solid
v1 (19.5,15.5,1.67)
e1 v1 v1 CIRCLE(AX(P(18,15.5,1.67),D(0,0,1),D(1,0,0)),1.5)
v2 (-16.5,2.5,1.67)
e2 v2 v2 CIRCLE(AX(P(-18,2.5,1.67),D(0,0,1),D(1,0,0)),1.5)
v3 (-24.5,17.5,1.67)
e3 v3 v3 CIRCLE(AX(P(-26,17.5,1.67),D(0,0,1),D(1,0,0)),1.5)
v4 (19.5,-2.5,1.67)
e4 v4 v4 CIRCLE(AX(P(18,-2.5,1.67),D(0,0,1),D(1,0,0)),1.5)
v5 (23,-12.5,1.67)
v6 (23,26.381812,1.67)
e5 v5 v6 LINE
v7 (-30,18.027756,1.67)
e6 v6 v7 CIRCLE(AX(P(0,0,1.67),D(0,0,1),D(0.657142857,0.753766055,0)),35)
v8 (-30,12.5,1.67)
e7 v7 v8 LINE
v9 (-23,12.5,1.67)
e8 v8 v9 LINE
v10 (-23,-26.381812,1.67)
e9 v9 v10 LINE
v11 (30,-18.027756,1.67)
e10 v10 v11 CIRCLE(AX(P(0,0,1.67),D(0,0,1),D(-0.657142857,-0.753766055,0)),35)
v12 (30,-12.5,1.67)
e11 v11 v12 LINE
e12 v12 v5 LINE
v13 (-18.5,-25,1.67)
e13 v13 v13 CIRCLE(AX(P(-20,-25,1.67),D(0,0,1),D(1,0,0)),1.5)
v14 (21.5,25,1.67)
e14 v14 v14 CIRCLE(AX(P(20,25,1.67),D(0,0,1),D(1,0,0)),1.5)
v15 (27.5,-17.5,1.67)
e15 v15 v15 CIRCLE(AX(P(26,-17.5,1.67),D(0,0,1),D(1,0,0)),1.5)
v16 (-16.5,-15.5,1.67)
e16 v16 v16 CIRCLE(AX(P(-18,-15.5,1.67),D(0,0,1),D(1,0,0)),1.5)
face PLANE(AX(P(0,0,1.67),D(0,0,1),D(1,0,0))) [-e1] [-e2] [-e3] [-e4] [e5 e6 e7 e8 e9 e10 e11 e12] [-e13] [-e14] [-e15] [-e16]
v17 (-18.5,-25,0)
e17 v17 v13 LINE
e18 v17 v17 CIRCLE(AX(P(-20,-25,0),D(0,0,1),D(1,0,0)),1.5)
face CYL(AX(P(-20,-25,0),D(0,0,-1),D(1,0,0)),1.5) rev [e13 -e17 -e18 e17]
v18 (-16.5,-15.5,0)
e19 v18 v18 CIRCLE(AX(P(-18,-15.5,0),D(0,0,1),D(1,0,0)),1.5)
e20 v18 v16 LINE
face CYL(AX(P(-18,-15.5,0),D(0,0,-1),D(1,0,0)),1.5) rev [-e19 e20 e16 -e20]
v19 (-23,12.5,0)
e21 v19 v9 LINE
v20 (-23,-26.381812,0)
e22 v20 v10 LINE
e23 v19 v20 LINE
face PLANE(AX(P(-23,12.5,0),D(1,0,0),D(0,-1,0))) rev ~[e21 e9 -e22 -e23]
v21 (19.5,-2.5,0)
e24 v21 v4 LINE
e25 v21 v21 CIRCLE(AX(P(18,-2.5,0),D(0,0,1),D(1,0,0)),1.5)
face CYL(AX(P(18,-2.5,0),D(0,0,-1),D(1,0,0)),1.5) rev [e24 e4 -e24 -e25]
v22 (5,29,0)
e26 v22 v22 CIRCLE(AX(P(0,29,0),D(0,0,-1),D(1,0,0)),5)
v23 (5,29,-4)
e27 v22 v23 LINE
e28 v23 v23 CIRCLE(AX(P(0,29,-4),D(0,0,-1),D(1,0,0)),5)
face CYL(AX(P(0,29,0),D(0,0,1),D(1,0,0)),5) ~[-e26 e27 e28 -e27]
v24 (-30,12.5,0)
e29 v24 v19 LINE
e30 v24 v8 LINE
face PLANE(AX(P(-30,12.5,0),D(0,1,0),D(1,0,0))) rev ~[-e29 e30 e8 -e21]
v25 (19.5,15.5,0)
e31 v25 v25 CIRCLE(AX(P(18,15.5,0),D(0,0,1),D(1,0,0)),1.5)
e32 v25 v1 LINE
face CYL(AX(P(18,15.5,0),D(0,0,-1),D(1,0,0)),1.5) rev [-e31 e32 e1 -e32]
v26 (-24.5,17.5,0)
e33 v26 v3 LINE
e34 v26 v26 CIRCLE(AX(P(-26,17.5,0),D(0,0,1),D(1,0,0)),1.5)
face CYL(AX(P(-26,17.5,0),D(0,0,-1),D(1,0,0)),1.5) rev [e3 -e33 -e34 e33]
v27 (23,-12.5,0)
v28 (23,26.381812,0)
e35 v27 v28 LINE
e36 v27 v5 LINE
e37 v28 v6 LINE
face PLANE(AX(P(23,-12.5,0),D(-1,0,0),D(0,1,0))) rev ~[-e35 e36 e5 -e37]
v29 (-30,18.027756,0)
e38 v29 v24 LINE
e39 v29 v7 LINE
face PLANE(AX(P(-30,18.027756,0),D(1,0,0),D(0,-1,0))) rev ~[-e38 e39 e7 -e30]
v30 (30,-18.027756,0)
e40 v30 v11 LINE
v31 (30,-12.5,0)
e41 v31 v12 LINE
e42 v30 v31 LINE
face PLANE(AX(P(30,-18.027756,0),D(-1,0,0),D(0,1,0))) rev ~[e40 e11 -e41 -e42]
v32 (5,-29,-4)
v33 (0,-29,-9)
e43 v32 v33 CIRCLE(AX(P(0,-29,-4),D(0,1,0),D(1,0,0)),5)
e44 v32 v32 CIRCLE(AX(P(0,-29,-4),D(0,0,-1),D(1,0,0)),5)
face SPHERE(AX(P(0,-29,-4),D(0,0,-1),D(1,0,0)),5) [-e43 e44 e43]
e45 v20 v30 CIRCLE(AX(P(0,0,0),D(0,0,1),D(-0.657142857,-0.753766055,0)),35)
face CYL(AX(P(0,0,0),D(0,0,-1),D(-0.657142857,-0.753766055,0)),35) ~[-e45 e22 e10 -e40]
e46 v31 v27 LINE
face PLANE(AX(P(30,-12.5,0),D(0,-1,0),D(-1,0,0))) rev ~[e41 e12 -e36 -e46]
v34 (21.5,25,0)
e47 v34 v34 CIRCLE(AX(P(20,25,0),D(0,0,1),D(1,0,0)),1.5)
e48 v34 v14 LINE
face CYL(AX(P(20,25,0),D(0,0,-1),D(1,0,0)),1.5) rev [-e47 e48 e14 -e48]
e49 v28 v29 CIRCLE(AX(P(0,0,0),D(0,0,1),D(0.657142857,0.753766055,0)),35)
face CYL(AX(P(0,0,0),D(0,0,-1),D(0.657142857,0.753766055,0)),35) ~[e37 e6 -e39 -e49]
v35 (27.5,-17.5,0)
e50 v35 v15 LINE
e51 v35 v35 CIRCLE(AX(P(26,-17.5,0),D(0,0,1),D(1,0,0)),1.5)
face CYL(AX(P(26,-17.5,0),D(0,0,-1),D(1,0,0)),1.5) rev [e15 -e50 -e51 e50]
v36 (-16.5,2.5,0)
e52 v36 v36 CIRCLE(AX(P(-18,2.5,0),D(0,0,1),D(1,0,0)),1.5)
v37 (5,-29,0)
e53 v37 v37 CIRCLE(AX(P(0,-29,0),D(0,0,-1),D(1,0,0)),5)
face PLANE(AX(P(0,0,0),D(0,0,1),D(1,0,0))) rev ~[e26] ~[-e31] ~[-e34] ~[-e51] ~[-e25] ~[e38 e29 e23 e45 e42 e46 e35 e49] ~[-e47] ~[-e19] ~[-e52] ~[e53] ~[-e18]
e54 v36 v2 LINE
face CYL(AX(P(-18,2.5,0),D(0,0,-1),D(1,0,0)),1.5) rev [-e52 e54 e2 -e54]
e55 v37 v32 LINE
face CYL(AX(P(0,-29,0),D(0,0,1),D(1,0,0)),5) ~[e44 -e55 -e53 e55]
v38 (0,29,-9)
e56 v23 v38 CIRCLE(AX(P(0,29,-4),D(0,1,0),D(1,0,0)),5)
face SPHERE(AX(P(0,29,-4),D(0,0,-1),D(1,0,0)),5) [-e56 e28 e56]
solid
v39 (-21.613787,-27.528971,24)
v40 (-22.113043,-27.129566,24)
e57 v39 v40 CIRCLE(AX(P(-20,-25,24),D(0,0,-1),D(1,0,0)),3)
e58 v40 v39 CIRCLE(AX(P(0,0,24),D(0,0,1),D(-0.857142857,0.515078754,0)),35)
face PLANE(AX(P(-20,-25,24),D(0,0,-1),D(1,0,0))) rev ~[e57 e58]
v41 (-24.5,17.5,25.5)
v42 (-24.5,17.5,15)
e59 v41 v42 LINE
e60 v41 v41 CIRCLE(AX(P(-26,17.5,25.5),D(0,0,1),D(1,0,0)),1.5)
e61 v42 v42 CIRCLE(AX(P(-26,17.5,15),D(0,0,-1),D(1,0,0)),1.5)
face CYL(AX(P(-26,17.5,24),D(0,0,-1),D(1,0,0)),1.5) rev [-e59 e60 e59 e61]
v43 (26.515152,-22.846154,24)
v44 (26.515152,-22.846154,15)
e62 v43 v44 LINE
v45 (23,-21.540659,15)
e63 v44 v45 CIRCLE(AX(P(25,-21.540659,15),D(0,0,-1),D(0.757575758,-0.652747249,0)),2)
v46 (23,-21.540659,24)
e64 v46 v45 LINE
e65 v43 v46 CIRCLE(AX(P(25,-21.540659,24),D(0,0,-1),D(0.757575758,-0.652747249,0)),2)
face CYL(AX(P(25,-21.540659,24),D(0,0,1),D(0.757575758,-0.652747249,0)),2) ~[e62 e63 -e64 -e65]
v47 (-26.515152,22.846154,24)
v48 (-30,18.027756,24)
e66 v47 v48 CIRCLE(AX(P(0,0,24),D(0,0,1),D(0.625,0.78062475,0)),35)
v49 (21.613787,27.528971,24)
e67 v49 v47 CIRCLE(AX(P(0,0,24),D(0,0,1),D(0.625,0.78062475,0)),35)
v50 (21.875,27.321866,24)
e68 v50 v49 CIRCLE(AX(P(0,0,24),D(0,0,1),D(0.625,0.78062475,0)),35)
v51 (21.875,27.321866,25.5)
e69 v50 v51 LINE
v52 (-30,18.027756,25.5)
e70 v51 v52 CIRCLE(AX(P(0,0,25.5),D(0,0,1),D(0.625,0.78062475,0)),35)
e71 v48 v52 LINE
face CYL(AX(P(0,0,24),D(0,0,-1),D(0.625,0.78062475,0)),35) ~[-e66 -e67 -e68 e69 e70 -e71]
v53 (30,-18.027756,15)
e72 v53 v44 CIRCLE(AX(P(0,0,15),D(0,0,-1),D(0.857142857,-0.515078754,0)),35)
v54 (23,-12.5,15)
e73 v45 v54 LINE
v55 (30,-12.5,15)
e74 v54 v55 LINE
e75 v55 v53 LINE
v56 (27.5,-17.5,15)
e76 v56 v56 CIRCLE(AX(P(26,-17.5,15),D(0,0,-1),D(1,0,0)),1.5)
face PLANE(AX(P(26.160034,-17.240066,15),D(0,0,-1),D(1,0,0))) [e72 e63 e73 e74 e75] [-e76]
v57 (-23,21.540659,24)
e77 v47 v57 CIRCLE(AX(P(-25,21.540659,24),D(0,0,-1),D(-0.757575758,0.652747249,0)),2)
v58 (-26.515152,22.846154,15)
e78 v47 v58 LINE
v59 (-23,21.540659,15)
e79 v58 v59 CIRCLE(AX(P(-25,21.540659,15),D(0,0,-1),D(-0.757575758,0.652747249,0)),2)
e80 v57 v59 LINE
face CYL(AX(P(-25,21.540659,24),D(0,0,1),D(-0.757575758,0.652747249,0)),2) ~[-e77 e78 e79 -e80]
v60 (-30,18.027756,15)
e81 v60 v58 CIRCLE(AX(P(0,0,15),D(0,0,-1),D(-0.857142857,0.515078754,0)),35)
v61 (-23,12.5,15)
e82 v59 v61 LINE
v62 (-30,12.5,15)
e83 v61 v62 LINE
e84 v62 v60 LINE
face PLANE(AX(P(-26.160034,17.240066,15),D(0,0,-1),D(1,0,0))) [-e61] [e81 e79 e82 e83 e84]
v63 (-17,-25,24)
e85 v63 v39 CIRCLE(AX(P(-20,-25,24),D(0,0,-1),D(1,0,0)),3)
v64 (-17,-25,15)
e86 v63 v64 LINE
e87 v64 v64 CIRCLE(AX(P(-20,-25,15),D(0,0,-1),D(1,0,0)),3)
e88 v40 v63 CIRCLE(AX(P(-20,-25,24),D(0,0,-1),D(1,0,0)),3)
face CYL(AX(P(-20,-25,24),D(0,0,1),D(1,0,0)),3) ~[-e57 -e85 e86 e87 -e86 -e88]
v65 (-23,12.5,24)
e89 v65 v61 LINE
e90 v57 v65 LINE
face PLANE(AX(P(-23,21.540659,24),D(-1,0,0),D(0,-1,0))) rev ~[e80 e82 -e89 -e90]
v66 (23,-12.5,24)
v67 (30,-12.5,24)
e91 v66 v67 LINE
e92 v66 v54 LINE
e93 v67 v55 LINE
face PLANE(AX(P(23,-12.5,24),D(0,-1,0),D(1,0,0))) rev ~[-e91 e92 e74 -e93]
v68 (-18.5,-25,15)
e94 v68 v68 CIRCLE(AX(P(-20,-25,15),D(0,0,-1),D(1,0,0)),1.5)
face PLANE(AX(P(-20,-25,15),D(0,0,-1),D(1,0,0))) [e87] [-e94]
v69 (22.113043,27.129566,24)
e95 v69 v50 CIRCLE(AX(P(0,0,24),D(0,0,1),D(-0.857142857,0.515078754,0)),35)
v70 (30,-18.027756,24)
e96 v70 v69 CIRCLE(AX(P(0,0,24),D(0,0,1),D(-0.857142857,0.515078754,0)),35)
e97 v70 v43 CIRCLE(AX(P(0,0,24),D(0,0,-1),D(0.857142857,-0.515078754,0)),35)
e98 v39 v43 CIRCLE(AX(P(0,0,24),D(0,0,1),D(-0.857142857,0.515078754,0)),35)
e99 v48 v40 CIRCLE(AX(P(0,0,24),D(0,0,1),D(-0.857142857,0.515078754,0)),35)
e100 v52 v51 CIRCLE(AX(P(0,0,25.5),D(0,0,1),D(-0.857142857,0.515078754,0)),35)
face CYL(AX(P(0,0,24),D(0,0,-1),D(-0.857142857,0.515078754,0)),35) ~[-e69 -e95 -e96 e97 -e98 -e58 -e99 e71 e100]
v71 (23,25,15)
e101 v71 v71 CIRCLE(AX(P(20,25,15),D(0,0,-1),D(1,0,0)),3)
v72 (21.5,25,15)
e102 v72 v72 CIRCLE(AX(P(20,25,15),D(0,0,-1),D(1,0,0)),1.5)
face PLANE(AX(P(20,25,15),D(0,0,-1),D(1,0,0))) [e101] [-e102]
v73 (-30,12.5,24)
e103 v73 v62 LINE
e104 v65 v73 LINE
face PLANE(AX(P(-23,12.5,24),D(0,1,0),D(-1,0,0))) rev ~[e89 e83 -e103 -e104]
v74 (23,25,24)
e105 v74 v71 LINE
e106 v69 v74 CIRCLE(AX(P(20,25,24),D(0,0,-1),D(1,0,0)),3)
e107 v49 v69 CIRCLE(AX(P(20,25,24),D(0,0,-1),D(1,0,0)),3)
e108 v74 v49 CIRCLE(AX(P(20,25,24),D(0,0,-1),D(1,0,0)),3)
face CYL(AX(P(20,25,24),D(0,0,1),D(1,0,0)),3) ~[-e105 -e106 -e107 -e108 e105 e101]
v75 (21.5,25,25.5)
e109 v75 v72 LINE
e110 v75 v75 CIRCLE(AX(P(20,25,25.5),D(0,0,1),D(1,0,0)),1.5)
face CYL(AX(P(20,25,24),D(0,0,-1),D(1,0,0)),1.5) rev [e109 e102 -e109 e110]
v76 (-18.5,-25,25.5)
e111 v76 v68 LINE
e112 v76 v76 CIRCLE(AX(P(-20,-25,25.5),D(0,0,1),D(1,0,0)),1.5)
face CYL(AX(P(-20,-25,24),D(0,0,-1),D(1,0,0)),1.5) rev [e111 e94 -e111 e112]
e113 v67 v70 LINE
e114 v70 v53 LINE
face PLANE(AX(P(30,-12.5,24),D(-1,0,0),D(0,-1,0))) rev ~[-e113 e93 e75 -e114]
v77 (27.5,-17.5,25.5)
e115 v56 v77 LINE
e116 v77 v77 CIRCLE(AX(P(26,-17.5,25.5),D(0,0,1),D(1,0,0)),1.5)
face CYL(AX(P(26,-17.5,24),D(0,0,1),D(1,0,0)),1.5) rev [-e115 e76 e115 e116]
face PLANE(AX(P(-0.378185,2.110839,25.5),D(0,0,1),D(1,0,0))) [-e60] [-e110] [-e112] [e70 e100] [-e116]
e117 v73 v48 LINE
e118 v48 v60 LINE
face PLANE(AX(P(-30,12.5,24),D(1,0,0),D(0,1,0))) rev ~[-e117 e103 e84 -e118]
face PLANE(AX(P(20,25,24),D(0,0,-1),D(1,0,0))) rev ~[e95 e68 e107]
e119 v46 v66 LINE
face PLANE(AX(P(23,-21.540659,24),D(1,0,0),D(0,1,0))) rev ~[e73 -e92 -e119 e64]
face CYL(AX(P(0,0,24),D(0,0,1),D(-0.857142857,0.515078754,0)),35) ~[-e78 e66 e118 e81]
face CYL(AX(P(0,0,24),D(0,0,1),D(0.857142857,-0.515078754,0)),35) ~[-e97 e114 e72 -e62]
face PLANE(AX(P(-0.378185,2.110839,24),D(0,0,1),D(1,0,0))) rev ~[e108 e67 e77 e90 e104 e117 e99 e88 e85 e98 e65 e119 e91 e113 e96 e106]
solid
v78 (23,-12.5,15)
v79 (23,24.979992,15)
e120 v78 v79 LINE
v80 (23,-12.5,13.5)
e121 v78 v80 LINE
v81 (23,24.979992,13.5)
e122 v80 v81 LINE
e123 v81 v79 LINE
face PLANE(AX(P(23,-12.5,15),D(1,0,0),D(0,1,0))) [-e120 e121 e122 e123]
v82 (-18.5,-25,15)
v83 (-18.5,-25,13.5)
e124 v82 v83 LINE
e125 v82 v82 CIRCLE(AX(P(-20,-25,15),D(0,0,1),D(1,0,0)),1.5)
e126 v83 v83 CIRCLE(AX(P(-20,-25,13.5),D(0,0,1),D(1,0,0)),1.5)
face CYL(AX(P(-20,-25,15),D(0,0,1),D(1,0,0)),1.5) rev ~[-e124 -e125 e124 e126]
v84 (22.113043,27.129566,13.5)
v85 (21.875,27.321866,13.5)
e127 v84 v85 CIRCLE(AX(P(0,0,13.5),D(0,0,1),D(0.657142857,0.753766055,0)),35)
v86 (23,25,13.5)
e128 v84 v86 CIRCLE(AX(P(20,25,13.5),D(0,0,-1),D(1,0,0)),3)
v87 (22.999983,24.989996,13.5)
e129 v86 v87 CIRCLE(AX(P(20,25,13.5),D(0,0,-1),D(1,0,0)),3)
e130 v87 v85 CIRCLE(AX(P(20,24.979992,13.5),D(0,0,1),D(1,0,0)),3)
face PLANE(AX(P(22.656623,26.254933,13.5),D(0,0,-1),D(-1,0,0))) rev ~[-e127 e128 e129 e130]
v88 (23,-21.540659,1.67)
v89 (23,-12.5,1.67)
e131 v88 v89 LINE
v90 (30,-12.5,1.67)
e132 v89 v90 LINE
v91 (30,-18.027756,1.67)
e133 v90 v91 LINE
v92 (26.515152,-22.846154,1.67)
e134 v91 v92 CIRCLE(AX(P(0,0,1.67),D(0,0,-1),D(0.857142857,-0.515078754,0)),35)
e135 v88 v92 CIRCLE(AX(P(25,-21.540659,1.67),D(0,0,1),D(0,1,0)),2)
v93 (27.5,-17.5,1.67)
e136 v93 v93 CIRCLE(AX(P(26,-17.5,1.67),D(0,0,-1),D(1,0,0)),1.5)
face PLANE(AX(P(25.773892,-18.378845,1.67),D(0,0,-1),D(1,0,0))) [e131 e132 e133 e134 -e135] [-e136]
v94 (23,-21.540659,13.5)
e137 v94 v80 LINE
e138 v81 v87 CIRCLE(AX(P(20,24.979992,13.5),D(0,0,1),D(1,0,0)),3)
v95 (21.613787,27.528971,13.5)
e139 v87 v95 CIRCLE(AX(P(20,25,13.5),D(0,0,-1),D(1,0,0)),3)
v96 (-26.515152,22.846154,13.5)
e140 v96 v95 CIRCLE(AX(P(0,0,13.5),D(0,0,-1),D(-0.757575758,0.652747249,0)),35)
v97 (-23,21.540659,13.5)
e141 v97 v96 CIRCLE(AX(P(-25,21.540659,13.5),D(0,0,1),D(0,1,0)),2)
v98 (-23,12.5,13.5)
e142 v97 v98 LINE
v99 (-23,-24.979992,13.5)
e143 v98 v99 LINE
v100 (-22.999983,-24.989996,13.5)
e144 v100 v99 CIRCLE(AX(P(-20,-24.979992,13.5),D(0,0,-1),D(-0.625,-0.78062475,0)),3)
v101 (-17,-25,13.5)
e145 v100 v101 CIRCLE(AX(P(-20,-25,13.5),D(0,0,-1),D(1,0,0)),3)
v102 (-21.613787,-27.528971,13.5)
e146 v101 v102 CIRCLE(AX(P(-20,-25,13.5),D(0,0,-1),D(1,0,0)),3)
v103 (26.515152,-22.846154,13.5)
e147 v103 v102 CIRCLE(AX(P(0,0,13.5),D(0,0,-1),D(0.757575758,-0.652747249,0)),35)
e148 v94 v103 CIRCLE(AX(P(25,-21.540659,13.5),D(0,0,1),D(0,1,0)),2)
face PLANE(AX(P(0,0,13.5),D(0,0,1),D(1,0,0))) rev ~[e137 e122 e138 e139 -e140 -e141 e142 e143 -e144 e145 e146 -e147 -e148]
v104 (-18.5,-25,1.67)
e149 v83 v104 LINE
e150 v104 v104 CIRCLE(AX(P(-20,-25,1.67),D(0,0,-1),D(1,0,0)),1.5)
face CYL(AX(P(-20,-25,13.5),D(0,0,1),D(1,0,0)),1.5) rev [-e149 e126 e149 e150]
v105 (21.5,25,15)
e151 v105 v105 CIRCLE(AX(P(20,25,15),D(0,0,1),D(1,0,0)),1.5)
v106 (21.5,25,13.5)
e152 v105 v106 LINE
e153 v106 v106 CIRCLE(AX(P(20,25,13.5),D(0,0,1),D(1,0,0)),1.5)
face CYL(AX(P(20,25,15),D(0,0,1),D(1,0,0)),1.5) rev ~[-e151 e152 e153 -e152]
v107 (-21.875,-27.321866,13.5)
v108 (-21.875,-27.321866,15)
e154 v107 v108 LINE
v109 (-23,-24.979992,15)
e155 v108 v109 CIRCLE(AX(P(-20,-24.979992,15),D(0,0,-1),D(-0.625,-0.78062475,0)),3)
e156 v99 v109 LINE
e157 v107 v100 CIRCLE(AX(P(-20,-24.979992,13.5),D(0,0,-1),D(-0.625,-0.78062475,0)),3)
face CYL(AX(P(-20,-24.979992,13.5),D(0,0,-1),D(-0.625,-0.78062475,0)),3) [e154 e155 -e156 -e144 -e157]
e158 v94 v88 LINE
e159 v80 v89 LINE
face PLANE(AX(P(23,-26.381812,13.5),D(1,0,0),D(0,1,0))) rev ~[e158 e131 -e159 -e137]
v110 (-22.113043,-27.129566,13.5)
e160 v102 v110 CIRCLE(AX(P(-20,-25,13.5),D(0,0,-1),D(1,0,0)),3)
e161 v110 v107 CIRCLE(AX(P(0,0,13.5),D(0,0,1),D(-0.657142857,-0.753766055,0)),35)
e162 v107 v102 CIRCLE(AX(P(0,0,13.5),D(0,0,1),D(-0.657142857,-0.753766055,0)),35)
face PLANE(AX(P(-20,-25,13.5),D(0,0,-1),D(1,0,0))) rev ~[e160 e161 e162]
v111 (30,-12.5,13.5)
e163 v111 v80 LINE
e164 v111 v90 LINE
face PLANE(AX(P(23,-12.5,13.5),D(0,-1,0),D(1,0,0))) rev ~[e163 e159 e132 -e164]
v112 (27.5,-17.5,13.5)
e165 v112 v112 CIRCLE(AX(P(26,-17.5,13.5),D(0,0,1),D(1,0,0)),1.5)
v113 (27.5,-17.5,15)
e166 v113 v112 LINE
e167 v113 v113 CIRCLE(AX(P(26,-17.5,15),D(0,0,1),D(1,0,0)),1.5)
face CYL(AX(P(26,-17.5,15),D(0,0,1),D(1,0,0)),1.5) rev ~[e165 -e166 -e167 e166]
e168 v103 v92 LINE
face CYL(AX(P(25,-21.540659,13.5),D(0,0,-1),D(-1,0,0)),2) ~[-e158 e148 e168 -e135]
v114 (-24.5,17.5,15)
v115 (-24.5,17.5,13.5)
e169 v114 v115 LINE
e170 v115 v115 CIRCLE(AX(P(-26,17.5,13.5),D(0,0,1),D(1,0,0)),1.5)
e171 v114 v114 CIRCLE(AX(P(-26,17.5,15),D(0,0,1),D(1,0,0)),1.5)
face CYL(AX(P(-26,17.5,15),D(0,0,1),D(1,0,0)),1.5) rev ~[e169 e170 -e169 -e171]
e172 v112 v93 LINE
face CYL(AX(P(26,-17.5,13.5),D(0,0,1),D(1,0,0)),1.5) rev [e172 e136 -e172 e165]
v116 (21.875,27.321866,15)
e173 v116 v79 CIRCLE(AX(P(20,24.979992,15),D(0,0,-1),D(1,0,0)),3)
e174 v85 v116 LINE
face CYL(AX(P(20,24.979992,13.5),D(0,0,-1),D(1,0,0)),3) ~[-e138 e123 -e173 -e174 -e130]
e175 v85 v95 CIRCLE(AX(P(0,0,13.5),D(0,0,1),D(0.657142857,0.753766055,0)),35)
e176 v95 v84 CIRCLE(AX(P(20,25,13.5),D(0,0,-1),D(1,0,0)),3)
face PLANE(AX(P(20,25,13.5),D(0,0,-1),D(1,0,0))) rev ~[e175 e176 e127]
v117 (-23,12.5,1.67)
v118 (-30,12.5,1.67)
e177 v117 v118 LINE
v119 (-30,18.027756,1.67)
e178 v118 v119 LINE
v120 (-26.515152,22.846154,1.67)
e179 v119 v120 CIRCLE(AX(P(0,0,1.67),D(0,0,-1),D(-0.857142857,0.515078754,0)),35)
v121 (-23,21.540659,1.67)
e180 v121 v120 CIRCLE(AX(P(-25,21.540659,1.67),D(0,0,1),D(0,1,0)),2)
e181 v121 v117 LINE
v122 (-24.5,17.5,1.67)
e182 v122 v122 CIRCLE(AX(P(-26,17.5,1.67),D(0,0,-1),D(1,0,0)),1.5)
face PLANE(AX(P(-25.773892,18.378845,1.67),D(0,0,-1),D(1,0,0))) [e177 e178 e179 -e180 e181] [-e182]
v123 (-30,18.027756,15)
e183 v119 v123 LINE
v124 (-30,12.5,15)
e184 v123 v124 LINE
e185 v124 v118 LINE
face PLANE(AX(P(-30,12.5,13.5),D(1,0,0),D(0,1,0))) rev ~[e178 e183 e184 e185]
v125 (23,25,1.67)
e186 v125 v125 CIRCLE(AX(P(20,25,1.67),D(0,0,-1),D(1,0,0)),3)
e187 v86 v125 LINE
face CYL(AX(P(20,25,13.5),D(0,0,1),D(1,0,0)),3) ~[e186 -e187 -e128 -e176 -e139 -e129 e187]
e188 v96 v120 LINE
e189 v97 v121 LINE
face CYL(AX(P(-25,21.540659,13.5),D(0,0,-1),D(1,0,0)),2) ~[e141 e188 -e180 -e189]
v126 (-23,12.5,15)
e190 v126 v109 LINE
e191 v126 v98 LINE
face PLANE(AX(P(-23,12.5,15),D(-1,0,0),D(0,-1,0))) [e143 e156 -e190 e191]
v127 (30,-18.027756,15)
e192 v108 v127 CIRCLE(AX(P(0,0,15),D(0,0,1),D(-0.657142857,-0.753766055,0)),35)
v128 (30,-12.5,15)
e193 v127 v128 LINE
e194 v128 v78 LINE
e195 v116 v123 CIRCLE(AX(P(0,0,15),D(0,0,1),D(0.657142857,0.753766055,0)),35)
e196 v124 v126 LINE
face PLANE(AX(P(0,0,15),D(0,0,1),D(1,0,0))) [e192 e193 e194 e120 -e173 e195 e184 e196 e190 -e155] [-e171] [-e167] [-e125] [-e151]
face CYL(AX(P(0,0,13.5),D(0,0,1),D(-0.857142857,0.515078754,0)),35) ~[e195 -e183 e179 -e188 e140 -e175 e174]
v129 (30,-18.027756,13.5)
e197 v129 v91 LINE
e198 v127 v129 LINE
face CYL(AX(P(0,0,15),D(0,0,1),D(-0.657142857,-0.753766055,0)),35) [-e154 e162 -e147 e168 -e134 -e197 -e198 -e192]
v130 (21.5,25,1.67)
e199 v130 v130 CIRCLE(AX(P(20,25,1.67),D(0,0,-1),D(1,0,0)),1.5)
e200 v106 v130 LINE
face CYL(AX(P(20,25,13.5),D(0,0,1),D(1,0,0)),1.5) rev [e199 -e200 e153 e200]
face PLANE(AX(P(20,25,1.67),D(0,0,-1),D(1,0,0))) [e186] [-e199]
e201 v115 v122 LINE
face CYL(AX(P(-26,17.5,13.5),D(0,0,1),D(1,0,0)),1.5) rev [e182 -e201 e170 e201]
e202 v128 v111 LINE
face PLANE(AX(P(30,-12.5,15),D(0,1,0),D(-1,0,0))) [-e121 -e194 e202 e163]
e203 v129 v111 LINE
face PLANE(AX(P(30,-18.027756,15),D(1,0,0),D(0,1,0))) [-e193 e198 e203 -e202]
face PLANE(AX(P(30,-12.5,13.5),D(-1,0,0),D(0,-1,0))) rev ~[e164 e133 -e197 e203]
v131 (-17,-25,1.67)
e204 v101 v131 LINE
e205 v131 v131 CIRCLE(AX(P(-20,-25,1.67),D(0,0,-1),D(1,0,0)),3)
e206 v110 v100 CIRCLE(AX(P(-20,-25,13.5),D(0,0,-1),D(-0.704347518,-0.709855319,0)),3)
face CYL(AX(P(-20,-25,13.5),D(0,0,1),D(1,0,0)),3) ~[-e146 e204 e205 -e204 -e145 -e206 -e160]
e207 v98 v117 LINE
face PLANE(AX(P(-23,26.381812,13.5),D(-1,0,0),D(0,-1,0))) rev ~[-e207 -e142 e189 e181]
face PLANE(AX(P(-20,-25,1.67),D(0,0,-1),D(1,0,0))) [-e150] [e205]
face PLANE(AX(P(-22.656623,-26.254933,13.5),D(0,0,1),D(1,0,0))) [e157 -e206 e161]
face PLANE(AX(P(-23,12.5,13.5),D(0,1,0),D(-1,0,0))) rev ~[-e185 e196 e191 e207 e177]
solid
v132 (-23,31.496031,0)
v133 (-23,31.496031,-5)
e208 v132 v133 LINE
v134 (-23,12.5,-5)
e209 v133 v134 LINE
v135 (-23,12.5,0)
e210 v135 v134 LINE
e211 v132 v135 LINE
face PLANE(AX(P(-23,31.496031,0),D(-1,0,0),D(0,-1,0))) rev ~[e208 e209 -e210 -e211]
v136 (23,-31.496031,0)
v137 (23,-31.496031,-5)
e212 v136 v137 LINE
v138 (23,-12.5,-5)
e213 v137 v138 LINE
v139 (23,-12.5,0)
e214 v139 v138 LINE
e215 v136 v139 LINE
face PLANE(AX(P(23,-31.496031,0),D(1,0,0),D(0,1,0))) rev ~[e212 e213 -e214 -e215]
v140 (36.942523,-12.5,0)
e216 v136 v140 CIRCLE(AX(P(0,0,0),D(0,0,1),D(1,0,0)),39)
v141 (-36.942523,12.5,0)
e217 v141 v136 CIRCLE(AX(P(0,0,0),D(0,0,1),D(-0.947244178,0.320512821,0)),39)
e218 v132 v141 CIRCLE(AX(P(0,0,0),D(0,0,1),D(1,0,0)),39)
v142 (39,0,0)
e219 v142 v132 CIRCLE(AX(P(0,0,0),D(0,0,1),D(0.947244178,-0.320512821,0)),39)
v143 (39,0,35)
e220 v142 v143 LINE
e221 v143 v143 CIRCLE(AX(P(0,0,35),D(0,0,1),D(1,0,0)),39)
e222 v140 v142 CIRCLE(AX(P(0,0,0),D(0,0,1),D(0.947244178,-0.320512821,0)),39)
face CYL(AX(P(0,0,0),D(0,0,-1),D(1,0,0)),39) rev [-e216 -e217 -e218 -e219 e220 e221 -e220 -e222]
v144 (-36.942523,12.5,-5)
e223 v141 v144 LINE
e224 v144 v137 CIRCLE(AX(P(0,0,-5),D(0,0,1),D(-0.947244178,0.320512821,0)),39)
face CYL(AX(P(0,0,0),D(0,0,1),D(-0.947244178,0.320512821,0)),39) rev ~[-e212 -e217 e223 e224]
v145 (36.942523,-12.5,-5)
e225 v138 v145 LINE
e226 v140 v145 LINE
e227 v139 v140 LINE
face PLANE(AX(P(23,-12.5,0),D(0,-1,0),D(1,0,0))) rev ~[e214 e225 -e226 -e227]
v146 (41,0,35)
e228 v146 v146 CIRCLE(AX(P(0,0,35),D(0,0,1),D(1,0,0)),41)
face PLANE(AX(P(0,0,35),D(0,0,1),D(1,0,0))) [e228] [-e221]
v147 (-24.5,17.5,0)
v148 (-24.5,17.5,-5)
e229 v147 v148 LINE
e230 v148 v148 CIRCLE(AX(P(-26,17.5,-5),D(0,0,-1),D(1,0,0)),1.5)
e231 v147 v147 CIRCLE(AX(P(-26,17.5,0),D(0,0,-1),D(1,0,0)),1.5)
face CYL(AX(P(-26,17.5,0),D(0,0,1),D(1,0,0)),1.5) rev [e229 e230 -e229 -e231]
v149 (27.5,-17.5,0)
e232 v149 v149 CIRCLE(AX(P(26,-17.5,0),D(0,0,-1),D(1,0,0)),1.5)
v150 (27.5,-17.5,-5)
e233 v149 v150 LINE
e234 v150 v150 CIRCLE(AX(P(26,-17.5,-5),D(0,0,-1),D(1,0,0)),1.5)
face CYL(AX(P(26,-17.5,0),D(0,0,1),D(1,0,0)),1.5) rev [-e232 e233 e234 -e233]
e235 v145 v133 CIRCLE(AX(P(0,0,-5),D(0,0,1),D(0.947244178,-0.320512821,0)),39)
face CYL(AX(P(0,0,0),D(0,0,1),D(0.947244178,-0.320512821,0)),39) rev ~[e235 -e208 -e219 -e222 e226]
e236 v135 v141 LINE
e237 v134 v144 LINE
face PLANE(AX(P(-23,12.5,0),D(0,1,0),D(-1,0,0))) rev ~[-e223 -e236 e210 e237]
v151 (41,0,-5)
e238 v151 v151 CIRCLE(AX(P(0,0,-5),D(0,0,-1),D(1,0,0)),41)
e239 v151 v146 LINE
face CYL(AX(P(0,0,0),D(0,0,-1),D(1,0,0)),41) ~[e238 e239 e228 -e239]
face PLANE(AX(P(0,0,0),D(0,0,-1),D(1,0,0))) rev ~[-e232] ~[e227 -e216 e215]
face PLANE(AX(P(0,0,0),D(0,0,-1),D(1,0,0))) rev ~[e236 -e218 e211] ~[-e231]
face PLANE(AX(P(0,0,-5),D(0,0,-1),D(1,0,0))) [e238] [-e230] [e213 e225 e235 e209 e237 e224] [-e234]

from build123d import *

# Parameters (mm, degrees)
F0_R         = 1.5
F1_DEPTH     = 1.67
F2_R         = 5
F3_DEPTH     = 9
F4_R         = 5
F6_R         = 1.5
F7_DEPTH     = 1.5
F8_R         = 1.5
F8_R_2       = 3
F9_DEPTH     = 11.83
F10_R        = 2
F11_T1_DEPTH = 5.1651459185
F13_R        = 1.5
F14_DEPTH    = 1.5
F15_R        = 1.5
F15_R_2      = 3
F16_DEPTH    = 9
F17_R        = 41
F17_R_2      = 1.5
F18_DEPTH    = 5
F19_R        = 41
F19_R_2      = 39
F20_DEPTH    = 35


# Not quite as in the source:
# - a fillet or chamfer that OpenCascade refuses, or shapes differently, is made with other operations: its cross-section is extruded or revolved along the edge and cut away or added
# - after a boolean that leaves OpenCascade's solid faulty, fix() repairs it


with BuildPart() as f1:
    # F0 (on Top) → F1 (new body)
    with BuildSketch(Plane.XY):
        with BuildLine():
            Line((-23, 12.5), (-23, -26.3818119165))
            ThreePointArc((-23, -26.3818119165), (5.4495468608, -34.5731462122), (30, -18.0277563773))
            Line((30, -18.0277563773), (30, -12.5))
            Line((30, -12.5), (23, -12.5))
            Line((23, -12.5), (23, 26.3818119165))
            ThreePointArc((23, 26.3818119165), (-5.4495468608, 34.5731462122), (-30, 18.0277563773))
            Line((-30, 18.0277563773), (-30, 12.5))
            Line((-30, 12.5), (-23, 12.5))
        make_face()
        with Locations((-20, -25)):
            Circle(F0_R, mode=Mode.SUBTRACT)
        with Locations((-18, -15.5)):
            Circle(F0_R, mode=Mode.SUBTRACT)
        with Locations((26, -17.5)):
            Circle(F0_R, mode=Mode.SUBTRACT)
        with Locations((18, -2.5)):
            Circle(F0_R, mode=Mode.SUBTRACT)
        with Locations((-18, 2.5)):
            Circle(F0_R, mode=Mode.SUBTRACT)
        with Locations((-26, 17.5)):
            Circle(F0_R, mode=Mode.SUBTRACT)
        with Locations((18, 15.5)):
            Circle(F0_R, mode=Mode.SUBTRACT)
        with Locations((20, 25)):
            Circle(F0_R, mode=Mode.SUBTRACT)
    extrude(amount=F1_DEPTH)

    # F2 (on face) → F3 (join)
    with BuildSketch(Plane(origin=(0, 0, 0), x_dir=(1, 0, 0), z_dir=(0, 0, -1))):
        with Locations((0, 29)):
            Circle(F2_R)
        with Locations((0, -29)):
            Circle(F2_R)
    extrude(amount=F3_DEPTH)

    # F4
    f4_edges = [f1.edges().sort_by_distance(p)[0] for p in [
        (-5, -29, -9),
        (-5, 29, -9),
    ]]
    fillet(f4_edges, radius=F4_R)


with BuildPart() as f7:
    # F6 (on offset) → F7 (new body)
    with BuildSketch(Plane.XY.offset(15)):
        with BuildLine():
            Line((-23, 12.5), (-23, -26.3818119165))
            ThreePointArc((-23, -26.3818119165), (5.4495468608, -34.5731462122), (30, -18.0277563773))
            Line((30, -18.0277563773), (30, -12.5))
            Line((30, -12.5), (23, -12.5))
            Line((23, -12.5), (23, 26.3818119165))
            ThreePointArc((23, 26.3818119165), (-5.4495468608, 34.5731462122), (-30, 18.0277563773))
            Line((-30, 18.0277563773), (-30, 12.5))
            Line((-30, 12.5), (-23, 12.5))
        make_face()
        with Locations((-20, -25)):
            Circle(F6_R, mode=Mode.SUBTRACT)
        with Locations((26, -17.5)):
            Circle(F6_R, mode=Mode.SUBTRACT)
        with Locations((-26, 17.5)):
            Circle(F6_R, mode=Mode.SUBTRACT)
        with Locations((20, 25)):
            Circle(F6_R, mode=Mode.SUBTRACT)
    extrude(amount=-F7_DEPTH)

    # F8 (on face) → F9 (join)
    with BuildSketch(Plane(origin=(0, 0, 13.5), x_dir=(1, 0, 0), z_dir=(0, 0, -1))):
        with BuildLine():
            Line((-23, -26.3818119165), (-23, -12.5))
            Line((-23, -12.5), (-30, -12.5))
            Line((-30, -12.5), (-30, -18.0277563773))
            ThreePointArc((-30, -18.0277563773), (-26.8271795198, -22.4789332267), (-23, -26.3818119165))
        make_face()
        with Locations((-26, -17.5)):
            Circle(F8_R, mode=Mode.SUBTRACT)
        with Locations((20, -25)):
            Circle(F8_R_2)
        with Locations((20, -25)):
            Circle(F8_R, mode=Mode.SUBTRACT)
        with Locations((-20, 25)):
            Circle(F8_R_2)
        with Locations((-20, 25)):
            Circle(F8_R, mode=Mode.SUBTRACT)
        with BuildLine():
            Line((23, 12.5), (30, 12.5))
            Line((30, 12.5), (30, 18.0277563773))
            ThreePointArc((30, 18.0277563773), (26.8271795198, 22.4789332267), (23, 26.3818119165))
            Line((23, 26.3818119165), (23, 12.5))
        make_face()
        with Locations((26, 17.5)):
            Circle(F8_R, mode=Mode.SUBTRACT)
    extrude(amount=F9_DEPTH)

    # F10
    f10_edges = [f7.edges().sort_by_distance(p)[0] for p in [
        (23, -26.381812, 7.585),
        (-23, 26.381812, 7.585),
    ]]
    fillet(f10_edges, radius=F10_R)

    # F11: fillet of radius 3 on 2 edges, made by hand

    # F11_s2 → F11_t1 (cut)
    with BuildSketch(Plane.XY.offset(13.5)):
        with BuildLine():
            ThreePointArc((-21.875, -27.321866243), (-22.7041634566, -26.2790300993), (-23, -24.9799919936))
            Line((-23, -24.9799919936), (-23, -26.3818119165))
            ThreePointArc((-23, -26.3818119165), (-22.4424225917, -26.8577301389), (-21.875, -27.321866243))
        make_face()
        with BuildLine():
            ThreePointArc((23, 24.9799919936), (22.7041634566, 26.2790300993), (21.875, 27.321866243))
            ThreePointArc((21.875, 27.321866243), (22.4424225917, 26.8577301389), (23, 26.3818119165))
            Line((23, 26.3818119165), (23, 24.9799919936))
        make_face()
    extrude(amount=F11_T1_DEPTH, mode=Mode.SUBTRACT)


with BuildPart() as f14:
    # F13 (on offset) → F14 (new body)
    with BuildSketch(Plane.XY.offset(24)):
        with BuildLine():
            ThreePointArc((-30, 18.0277563773), (6.1724408299, -34.451429204), (21.875, 27.321866243))
            ThreePointArc((21.875, 27.321866243), (-6.1724408299, 34.451429204), (-30, 18.0277563773))
        make_face()
        with Locations((-20, -25)):
            Circle(F13_R, mode=Mode.SUBTRACT)
        with Locations((26, -17.5)):
            Circle(F13_R, mode=Mode.SUBTRACT)
        with Locations((-26, 17.5)):
            Circle(F13_R, mode=Mode.SUBTRACT)
        with Locations((20, 25)):
            Circle(F13_R, mode=Mode.SUBTRACT)
    extrude(amount=F14_DEPTH)

    # F15 (on face) → F16 (join)
    with BuildSketch(Plane(origin=(0, 0, 24), x_dir=(1, 0, 0), z_dir=(0, 0, -1))):
        with BuildLine():
            Line((23, 21.5406592285), (23, 12.5))
            Line((23, 12.5), (30, 12.5))
            Line((30, 12.5), (30, 18.0277563773))
            ThreePointArc((30, 18.0277563773), (28.3600921358, 20.5110988016), (26.5151515152, 22.8461537272))
            ThreePointArc((26.5151515152, 22.8461537272), (24.3036893762, 23.4155329617), (23, 21.5406592285))
        make_face()
        with Locations((26, 17.5)):
            Circle(F15_R, mode=Mode.SUBTRACT)
        with BuildLine():
            Line((-23, -21.5406592285), (-23, -12.5))
            Line((-23, -12.5), (-30, -12.5))
            Line((-30, -12.5), (-30, -18.0277563773))
            ThreePointArc((-30, -18.0277563773), (-28.3600921358, -20.5110988016), (-26.5151515152, -22.8461537272))
            ThreePointArc((-26.5151515152, -22.8461537272), (-24.3036893762, -23.4155329617), (-23, -21.5406592285))
        make_face()
        with Locations((-26, -17.5)):
            Circle(F15_R, mode=Mode.SUBTRACT)
        with Locations((20, -25)):
            Circle(F15_R_2)
        with Locations((20, -25)):
            Circle(F15_R, mode=Mode.SUBTRACT)
        with Locations((-20, 25)):
            Circle(F15_R_2)
        with Locations((-20, 25)):
            Circle(F15_R, mode=Mode.SUBTRACT)
    extrude(amount=F16_DEPTH)


with BuildPart() as f18:
    # F17 (on face) → F18 (new body)
    with BuildSketch(Plane(origin=(0, 0, 0), x_dir=(1, 0, 0), z_dir=(0, 0, -1))):
        Circle(F17_R)
        with BuildLine():
            ThreePointArc((-36.9425229241, -12.5), (-23.0762038304, 31.4402419962), (23, 31.496031496))
            Line((23, 31.496031496), (23, 26.3818119165))
            ThreePointArc((23, 26.3818119165), (26.8271795198, 22.4789332267), (30, 18.0277563773))
            Line((30, 18.0277563773), (30, 12.5))
            Line((30, 12.5), (36.9425229241, 12.5))
            ThreePointArc((36.9425229241, 12.5), (23.0762038304, -31.4402419962), (-23, -31.496031496))
            Line((-23, -31.496031496), (-23, -26.3818119165))
            ThreePointArc((-23, -26.3818119165), (-26.8271795198, -22.4789332267), (-30, -18.0277563773))
            Line((-30, -18.0277563773), (-30, -12.5))
            Line((-30, -12.5), (-36.9425229241, -12.5))
        make_face(mode=Mode.SUBTRACT)
        with BuildLine():
            ThreePointArc((30, 18.0277563773), (26.8271795198, 22.4789332267), (23, 26.3818119165))
            Line((23, 26.3818119165), (23, 12.5))
            Line((23, 12.5), (30, 12.5))
            Line((30, 12.5), (30, 18.0277563773))
        make_face()
        with Locations((26, 17.5)):
            Circle(F17_R_2, mode=Mode.SUBTRACT)
        with BuildLine():
            Line((-23, -12.5), (-30, -12.5))
            Line((-30, -12.5), (-30, -18.0277563773))
            ThreePointArc((-30, -18.0277563773), (-26.8271795198, -22.4789332267), (-23, -26.3818119165))
            Line((-23, -26.3818119165), (-23, -12.5))
        make_face()
        with Locations((-26, -17.5)):
            Circle(F17_R_2, mode=Mode.SUBTRACT)
    extrude(amount=F18_DEPTH)

    # F19 (on face) → F20 (join)
    with BuildSketch(Plane.XY):
        Circle(F19_R)
        Circle(F19_R_2, mode=Mode.SUBTRACT)
    extrude(amount=F20_DEPTH)

    add(f18.part.fix(), mode=Mode.REPLACE)


solid = Compound([f1.part, f7.part, f14.part, f18.part])
